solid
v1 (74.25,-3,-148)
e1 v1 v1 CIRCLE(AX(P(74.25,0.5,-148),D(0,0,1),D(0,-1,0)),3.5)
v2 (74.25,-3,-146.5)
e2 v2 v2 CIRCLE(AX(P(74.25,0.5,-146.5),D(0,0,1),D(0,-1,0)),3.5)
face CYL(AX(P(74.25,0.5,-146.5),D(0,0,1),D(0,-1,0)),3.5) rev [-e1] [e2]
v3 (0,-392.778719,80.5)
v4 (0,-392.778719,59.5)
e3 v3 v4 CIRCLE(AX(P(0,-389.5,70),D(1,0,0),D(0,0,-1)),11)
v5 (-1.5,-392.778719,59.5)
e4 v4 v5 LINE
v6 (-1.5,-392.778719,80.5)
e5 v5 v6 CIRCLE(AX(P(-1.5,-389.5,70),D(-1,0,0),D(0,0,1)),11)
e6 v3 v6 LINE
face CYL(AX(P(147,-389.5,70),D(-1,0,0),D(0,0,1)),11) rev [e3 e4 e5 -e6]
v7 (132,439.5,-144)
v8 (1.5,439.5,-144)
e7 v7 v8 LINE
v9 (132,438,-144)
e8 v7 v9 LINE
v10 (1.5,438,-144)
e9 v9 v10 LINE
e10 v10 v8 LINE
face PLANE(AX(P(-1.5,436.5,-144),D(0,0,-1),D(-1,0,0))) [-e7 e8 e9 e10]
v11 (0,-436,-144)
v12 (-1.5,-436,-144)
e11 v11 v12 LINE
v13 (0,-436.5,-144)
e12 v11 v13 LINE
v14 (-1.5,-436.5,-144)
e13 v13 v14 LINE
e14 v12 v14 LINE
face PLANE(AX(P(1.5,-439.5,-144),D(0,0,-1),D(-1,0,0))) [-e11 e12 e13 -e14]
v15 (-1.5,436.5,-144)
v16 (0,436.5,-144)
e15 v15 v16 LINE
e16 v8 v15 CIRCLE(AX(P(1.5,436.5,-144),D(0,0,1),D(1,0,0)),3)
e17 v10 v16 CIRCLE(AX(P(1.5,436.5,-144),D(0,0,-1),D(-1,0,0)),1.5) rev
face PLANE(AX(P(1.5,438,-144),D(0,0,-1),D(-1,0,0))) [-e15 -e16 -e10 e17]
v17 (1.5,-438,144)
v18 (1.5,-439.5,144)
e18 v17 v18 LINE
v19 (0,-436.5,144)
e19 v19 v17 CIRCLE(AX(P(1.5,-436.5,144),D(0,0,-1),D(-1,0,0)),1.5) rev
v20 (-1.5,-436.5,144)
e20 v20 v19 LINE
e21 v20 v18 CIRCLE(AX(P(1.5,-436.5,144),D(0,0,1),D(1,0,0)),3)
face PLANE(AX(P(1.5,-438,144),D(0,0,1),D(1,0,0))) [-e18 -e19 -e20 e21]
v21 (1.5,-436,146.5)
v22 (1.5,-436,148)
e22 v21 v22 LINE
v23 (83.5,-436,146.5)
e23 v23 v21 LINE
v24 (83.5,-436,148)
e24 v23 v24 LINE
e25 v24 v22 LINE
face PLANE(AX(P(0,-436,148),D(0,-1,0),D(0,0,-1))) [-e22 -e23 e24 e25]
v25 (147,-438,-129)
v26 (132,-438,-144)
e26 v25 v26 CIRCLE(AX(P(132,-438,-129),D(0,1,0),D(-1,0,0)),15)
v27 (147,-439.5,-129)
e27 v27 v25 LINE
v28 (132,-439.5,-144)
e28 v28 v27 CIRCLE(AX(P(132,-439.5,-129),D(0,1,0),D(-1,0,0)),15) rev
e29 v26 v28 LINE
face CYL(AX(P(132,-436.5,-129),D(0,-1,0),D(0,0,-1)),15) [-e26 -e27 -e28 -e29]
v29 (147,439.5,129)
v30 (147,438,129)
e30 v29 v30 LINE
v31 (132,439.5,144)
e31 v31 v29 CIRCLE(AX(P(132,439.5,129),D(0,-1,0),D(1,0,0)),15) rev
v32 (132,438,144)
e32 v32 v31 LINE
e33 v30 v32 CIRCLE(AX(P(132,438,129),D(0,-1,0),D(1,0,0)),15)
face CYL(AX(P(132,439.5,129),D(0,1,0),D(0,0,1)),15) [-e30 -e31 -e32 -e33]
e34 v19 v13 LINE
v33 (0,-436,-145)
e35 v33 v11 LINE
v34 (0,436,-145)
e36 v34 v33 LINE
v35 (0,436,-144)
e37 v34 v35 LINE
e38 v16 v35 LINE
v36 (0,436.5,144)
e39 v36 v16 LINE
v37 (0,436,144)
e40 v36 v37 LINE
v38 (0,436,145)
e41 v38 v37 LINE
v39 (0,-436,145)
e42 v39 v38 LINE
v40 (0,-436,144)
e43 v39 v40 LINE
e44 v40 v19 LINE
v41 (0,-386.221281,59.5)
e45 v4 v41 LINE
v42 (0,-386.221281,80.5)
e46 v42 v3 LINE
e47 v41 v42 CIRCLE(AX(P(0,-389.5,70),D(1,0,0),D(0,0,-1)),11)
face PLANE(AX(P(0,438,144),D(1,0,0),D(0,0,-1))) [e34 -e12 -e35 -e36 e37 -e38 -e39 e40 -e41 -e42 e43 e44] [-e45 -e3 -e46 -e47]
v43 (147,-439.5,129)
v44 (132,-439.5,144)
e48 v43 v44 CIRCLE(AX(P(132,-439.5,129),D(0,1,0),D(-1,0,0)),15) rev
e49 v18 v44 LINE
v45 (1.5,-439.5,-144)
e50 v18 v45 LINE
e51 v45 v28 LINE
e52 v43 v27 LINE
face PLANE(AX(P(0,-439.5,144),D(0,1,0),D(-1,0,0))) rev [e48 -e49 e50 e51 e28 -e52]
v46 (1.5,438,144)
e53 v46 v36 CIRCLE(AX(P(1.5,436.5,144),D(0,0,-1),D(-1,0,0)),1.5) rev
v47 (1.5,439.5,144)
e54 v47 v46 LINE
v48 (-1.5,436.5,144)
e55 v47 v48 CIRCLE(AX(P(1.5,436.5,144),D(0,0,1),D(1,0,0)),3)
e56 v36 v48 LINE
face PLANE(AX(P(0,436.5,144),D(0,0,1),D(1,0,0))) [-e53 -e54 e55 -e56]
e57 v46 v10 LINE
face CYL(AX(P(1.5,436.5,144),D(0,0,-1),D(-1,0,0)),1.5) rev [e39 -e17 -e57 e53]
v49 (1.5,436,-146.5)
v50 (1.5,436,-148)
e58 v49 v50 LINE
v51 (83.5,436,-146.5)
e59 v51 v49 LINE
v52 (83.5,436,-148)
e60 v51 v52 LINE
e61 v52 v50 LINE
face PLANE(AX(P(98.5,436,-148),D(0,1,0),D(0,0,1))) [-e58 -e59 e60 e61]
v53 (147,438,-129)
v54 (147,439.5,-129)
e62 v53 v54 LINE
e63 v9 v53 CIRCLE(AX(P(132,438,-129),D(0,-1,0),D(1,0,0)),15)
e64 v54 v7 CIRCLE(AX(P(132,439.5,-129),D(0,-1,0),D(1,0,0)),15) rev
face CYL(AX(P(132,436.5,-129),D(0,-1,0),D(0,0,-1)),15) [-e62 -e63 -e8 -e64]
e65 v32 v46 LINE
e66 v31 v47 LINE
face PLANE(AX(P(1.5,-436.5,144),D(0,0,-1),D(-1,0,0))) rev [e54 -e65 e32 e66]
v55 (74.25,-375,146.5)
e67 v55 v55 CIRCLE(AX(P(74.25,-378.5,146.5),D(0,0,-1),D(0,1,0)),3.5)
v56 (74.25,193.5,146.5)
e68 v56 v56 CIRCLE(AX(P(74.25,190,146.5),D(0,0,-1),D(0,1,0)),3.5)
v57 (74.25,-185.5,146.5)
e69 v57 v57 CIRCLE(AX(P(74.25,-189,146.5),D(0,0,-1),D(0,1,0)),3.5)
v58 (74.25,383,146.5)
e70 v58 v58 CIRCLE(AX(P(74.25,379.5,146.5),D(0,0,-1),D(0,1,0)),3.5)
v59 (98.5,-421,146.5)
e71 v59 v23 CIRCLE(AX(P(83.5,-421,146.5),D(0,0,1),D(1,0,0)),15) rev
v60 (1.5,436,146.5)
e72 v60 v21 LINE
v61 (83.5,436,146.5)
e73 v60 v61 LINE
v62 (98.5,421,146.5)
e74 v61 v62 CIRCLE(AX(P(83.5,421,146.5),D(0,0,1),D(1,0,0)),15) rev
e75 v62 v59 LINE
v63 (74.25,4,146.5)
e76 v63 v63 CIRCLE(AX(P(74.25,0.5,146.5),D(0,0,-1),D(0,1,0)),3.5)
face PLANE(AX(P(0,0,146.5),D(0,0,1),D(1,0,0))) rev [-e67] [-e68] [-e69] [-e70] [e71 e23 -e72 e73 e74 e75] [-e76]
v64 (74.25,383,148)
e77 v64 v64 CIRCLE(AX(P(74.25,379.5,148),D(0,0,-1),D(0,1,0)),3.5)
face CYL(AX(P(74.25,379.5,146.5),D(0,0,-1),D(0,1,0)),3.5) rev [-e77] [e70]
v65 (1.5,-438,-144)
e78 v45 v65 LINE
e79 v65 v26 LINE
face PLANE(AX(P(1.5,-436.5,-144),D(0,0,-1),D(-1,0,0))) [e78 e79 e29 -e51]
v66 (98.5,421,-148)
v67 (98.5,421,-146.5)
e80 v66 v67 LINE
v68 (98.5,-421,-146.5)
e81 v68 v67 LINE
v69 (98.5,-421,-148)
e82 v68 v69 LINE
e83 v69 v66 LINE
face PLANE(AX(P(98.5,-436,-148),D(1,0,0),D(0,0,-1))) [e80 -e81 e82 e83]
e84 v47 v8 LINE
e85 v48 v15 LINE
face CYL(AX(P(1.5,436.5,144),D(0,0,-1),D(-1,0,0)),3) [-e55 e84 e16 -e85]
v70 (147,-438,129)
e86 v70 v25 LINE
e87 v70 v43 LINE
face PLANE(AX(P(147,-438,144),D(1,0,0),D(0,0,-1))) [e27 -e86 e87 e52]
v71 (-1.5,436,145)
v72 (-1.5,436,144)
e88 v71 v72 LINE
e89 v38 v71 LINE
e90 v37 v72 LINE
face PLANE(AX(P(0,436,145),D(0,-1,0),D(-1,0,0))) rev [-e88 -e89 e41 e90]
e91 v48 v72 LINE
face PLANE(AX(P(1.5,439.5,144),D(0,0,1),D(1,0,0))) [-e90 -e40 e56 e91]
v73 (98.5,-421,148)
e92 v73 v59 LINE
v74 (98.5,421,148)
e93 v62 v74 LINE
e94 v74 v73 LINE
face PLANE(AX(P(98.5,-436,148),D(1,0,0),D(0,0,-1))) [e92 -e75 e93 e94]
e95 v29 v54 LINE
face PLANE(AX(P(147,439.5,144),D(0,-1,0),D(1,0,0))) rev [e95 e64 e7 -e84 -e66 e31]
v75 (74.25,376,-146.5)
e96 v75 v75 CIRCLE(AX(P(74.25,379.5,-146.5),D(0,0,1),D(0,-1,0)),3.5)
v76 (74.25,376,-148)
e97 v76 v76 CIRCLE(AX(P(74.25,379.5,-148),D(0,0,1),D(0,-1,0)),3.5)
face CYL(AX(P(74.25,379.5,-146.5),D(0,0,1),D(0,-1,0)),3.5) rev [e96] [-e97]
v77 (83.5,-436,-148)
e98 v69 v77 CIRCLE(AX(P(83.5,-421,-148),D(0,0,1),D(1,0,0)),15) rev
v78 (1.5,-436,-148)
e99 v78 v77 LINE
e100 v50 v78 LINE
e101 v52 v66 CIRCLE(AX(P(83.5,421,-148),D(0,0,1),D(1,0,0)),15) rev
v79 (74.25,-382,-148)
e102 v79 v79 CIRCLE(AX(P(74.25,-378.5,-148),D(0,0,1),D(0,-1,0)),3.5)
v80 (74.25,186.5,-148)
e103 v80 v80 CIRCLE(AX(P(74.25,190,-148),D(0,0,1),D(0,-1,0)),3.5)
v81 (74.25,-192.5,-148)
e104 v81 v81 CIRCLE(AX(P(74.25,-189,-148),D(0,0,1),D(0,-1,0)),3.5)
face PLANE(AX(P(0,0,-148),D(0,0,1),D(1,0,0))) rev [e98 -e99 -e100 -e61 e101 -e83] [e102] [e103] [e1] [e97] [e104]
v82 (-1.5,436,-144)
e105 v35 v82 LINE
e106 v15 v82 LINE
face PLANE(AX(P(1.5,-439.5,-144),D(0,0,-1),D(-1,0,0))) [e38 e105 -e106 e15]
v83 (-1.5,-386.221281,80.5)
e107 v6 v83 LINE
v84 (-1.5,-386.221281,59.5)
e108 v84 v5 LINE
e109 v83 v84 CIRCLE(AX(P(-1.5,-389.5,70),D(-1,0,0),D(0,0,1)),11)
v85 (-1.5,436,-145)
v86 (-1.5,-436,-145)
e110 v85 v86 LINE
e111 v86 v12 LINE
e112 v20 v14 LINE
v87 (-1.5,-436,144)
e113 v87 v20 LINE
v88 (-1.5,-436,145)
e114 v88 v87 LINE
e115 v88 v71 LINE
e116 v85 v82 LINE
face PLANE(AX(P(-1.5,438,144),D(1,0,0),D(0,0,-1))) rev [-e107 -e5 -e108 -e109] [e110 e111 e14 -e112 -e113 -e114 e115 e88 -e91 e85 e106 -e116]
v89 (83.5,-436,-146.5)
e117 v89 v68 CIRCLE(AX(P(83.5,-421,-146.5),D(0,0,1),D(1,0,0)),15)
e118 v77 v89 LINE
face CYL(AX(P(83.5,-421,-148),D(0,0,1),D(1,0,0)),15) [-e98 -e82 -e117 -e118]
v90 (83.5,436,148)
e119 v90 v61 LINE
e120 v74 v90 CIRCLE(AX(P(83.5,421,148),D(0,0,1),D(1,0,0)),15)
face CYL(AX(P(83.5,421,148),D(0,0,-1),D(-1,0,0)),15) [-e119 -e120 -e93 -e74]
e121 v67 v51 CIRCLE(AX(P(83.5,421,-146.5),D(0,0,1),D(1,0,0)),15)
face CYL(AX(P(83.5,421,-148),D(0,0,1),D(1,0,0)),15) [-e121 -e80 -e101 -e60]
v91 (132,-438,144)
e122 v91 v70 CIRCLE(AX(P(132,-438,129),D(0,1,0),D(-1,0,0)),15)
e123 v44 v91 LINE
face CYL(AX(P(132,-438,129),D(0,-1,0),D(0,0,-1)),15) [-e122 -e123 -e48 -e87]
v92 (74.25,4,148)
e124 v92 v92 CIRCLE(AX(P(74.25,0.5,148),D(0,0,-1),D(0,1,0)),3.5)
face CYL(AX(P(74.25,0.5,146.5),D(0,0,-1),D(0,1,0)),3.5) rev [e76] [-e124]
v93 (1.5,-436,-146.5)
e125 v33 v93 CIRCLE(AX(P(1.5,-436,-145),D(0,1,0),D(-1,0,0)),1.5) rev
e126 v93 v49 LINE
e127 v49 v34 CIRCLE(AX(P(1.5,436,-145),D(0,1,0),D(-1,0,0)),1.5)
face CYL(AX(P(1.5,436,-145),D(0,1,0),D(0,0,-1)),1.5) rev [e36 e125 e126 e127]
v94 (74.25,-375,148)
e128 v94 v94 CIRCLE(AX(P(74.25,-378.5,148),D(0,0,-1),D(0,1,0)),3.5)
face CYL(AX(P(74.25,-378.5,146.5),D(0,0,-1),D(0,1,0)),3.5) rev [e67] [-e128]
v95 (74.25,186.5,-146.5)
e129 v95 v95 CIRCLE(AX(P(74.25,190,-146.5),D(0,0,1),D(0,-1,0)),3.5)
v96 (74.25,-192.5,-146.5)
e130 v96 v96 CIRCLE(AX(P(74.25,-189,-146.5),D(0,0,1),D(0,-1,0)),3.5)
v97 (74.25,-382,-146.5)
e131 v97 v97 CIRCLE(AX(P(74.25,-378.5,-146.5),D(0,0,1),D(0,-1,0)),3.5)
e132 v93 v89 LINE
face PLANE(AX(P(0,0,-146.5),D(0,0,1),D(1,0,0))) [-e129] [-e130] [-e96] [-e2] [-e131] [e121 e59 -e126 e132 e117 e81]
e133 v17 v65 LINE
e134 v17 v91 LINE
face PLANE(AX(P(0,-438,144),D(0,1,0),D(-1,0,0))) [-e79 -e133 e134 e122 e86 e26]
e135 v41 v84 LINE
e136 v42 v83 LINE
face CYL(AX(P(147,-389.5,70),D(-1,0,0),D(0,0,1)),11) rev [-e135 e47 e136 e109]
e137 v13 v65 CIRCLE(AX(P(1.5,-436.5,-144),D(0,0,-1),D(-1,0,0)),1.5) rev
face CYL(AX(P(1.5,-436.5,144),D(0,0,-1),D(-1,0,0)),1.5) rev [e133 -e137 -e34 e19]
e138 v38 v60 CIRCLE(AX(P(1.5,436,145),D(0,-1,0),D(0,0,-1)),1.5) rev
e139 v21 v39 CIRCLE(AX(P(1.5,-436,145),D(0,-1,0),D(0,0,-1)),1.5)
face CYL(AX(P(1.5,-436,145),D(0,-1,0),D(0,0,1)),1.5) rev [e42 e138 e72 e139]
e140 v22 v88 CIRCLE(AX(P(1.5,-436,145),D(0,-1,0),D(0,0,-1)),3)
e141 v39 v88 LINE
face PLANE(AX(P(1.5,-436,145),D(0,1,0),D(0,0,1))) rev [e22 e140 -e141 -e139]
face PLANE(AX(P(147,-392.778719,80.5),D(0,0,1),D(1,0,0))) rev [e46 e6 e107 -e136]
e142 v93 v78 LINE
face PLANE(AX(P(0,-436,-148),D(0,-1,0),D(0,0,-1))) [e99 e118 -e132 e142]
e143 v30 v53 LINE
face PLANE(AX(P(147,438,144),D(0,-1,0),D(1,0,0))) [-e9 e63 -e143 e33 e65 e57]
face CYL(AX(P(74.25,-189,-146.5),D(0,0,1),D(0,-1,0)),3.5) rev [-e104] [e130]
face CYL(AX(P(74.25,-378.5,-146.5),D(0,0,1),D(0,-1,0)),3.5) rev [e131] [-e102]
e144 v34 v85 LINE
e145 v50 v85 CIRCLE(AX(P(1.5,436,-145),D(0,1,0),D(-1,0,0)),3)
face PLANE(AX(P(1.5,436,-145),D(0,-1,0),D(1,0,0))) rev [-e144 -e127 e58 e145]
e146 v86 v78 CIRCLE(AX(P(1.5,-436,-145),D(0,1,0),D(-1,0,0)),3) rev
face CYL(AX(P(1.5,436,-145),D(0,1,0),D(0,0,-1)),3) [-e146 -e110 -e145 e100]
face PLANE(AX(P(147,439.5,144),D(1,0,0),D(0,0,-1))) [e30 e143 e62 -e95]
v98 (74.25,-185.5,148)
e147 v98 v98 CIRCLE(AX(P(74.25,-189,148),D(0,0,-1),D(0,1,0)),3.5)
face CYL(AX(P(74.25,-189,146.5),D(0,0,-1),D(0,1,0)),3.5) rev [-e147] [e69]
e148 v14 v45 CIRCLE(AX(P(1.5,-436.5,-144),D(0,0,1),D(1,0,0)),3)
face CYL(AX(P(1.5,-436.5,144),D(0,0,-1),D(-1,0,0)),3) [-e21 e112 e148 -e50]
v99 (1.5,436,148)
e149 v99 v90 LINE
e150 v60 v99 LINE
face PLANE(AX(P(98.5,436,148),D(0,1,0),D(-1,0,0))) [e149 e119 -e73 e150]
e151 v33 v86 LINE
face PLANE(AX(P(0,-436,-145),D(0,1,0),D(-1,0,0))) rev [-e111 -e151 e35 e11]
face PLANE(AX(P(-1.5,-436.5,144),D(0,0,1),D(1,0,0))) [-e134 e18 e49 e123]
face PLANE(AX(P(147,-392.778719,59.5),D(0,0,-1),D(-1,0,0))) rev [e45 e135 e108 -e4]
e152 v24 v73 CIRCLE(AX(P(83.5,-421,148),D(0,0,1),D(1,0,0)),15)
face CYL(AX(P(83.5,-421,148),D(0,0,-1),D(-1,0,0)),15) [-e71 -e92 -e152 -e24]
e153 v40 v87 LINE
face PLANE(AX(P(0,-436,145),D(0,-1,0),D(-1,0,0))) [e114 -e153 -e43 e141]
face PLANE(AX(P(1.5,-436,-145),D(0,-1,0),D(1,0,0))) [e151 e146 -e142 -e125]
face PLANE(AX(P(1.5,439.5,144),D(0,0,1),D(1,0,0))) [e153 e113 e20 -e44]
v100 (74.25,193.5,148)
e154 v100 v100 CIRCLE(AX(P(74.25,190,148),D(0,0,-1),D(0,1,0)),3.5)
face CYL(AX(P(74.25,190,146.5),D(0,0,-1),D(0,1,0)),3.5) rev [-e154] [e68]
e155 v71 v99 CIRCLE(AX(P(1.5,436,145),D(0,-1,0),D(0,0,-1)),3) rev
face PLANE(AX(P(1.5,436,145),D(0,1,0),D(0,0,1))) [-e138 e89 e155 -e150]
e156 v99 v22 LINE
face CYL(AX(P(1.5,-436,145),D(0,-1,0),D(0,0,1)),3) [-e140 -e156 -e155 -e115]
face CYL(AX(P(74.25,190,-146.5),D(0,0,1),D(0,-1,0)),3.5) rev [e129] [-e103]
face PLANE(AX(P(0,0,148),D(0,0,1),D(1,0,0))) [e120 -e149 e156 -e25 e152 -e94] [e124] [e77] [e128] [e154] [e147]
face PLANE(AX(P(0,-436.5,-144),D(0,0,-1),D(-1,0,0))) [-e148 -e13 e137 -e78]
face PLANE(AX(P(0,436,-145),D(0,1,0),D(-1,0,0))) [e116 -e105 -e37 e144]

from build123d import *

# Parameters (mm, degrees)
BASE_FLANGE1_DEPTH           = 144
EDGE_FLANGE1_DEPTH           = 872
EDGE_FLANGE1_BEND_DEPTH      = 872
F_7_0_7_DIAMETER_HOLE1_D     = 7
F_7_0_7_DIAMETER_HOLE1_DEPTH = 1.5
FILLET1_R                    = 15
CUT_EXTRUDE1_DEPTH           = 487.946095579


# Sheet-metal steps are written as plain solids
with BuildPart() as part:
    # Sketch1 → Base-Flange1 (new, symmetric)
    with BuildSketch(Plane.XY):
        with BuildLine():
            Line((147, 438), (1.5, 438))
            ThreePointArc((1.5, 438), (0.439339828, 437.560660172), (0, 436.5))
            Line((0, 436.5), (0, -436.5))
            ThreePointArc((0, -436.5), (0.439339828, -437.560660172), (1.5, -438))
            Line((1.5, -438), (147, -438))
            Line((147, -438), (147, -439.5))
            Line((147, -439.5), (1.5, -439.5))
            ThreePointArc((1.5, -439.5), (-0.621320344, -438.621320344), (-1.5, -436.5))
            Line((-1.5, -436.5), (-1.5, 436.5))
            ThreePointArc((-1.5, 436.5), (-0.621320344, 438.621320344), (1.5, 439.5))
            Line((1.5, 439.5), (147, 439.5))
            Line((147, 439.5), (147, 438))
        make_face()
    extrude(amount=BASE_FLANGE1_DEPTH, both=True)

    # Edge-Flange1 section (across the edge) → Edge-Flange1 (add)
    with BuildSketch(Plane(origin=(0, 436, 146.5), x_dir=(0, 0, -1), z_dir=(0, -1, 0))):
        with BuildLine():
            Line((-1.5, 1.5), (-1.5, 98.5))
            Line((-1.5, 98.5), (0, 98.5))
            Line((0, 98.5), (0, 1.5))
            ThreePointArc((0, 1.5), (0.439339828, 0.439339828), (1.5, 0))
            Line((1.5, 0), (2.5, 0))
            Line((2.5, 0), (2.5, -1.5))
            Line((2.5, -1.5), (1.5, -1.5))
            ThreePointArc((1.5, -1.5), (-0.621320344, -0.621320344), (-1.5, 1.5))
        make_face()
    extrude(amount=EDGE_FLANGE1_DEPTH)

    # Edge-Flange1 section 2 (across the edge) → Edge-Flange1 bend (add)
    with BuildSketch(Plane(origin=(0, -436, -146.5), x_dir=(0, 0, 1), z_dir=(0, 1, 0))):
        with BuildLine():
            Line((-1.5, 1.5), (-1.5, 98.5))
            Line((-1.5, 98.5), (0, 98.5))
            Line((0, 98.5), (0, 1.5))
            ThreePointArc((0, 1.5), (0.439339828, 0.439339828), (1.5, 0))
            Line((1.5, 0), (2.5, 0))
            Line((2.5, 0), (2.5, -1.5))
            Line((2.5, -1.5), (1.5, -1.5))
            ThreePointArc((1.5, -1.5), (-0.621320344, -0.621320344), (-1.5, 1.5))
        make_face()
    extrude(amount=EDGE_FLANGE1_BEND_DEPTH)

    # Ø7.0 (7) Diameter Hole1
    with Locations(Plane(origin=(0, 0, 146.5), x_dir=(-1, 0, 0), z_dir=(0, 0, -1))):
        with Locations((-74.25, 379.5), (-74.25, 190), (-74.25, 0.5), (-74.25, -189), (-74.25, -378.5)):
            f_7_0_7_diameter_hole1 = Hole(F_7_0_7_DIAMETER_HOLE1_D / 2, depth=F_7_0_7_DIAMETER_HOLE1_DEPTH)

    # Mirror1: Ø7.0 (7) Diameter Hole1 across plane
    add(f_7_0_7_diameter_hole1.mirror(Plane.XY), mode=Mode.SUBTRACT)

    # Fillet1
    fillet1_edges = [part.edges().sort_by_distance(p)[0] for p in [
        (147, 438.75, -144),
        (147, -438.75, -144),
        (147, 438.75, 144),
        (98.5, 436, 147.25),
        (98.5, -436, 147.25),
        (98.5, -436, -147.25),
        (98.5, 436, -147.25),
        (147, -438.75, 144),
    ]]
    fillet(fillet1_edges, radius=FILLET1_R)

    # Sketch14 → Cut-Extrude1 (cut, through all)
    with BuildSketch(Plane.ZY.offset(1.5)):
        with BuildLine():
            Line((80.5, -392.778719262), (80.5, -386.221280738))
            ThreePointArc((80.5, -386.221280738), (70, -378.5), (59.5, -386.221280738))
            Line((59.5, -386.221280738), (59.5, -392.778719262))
            ThreePointArc((59.5, -392.778719262), (70, -400.5), (80.5, -392.778719262))
        make_face()
    extrude(amount=-CUT_EXTRUDE1_DEPTH, mode=Mode.SUBTRACT)


solid = part.part
